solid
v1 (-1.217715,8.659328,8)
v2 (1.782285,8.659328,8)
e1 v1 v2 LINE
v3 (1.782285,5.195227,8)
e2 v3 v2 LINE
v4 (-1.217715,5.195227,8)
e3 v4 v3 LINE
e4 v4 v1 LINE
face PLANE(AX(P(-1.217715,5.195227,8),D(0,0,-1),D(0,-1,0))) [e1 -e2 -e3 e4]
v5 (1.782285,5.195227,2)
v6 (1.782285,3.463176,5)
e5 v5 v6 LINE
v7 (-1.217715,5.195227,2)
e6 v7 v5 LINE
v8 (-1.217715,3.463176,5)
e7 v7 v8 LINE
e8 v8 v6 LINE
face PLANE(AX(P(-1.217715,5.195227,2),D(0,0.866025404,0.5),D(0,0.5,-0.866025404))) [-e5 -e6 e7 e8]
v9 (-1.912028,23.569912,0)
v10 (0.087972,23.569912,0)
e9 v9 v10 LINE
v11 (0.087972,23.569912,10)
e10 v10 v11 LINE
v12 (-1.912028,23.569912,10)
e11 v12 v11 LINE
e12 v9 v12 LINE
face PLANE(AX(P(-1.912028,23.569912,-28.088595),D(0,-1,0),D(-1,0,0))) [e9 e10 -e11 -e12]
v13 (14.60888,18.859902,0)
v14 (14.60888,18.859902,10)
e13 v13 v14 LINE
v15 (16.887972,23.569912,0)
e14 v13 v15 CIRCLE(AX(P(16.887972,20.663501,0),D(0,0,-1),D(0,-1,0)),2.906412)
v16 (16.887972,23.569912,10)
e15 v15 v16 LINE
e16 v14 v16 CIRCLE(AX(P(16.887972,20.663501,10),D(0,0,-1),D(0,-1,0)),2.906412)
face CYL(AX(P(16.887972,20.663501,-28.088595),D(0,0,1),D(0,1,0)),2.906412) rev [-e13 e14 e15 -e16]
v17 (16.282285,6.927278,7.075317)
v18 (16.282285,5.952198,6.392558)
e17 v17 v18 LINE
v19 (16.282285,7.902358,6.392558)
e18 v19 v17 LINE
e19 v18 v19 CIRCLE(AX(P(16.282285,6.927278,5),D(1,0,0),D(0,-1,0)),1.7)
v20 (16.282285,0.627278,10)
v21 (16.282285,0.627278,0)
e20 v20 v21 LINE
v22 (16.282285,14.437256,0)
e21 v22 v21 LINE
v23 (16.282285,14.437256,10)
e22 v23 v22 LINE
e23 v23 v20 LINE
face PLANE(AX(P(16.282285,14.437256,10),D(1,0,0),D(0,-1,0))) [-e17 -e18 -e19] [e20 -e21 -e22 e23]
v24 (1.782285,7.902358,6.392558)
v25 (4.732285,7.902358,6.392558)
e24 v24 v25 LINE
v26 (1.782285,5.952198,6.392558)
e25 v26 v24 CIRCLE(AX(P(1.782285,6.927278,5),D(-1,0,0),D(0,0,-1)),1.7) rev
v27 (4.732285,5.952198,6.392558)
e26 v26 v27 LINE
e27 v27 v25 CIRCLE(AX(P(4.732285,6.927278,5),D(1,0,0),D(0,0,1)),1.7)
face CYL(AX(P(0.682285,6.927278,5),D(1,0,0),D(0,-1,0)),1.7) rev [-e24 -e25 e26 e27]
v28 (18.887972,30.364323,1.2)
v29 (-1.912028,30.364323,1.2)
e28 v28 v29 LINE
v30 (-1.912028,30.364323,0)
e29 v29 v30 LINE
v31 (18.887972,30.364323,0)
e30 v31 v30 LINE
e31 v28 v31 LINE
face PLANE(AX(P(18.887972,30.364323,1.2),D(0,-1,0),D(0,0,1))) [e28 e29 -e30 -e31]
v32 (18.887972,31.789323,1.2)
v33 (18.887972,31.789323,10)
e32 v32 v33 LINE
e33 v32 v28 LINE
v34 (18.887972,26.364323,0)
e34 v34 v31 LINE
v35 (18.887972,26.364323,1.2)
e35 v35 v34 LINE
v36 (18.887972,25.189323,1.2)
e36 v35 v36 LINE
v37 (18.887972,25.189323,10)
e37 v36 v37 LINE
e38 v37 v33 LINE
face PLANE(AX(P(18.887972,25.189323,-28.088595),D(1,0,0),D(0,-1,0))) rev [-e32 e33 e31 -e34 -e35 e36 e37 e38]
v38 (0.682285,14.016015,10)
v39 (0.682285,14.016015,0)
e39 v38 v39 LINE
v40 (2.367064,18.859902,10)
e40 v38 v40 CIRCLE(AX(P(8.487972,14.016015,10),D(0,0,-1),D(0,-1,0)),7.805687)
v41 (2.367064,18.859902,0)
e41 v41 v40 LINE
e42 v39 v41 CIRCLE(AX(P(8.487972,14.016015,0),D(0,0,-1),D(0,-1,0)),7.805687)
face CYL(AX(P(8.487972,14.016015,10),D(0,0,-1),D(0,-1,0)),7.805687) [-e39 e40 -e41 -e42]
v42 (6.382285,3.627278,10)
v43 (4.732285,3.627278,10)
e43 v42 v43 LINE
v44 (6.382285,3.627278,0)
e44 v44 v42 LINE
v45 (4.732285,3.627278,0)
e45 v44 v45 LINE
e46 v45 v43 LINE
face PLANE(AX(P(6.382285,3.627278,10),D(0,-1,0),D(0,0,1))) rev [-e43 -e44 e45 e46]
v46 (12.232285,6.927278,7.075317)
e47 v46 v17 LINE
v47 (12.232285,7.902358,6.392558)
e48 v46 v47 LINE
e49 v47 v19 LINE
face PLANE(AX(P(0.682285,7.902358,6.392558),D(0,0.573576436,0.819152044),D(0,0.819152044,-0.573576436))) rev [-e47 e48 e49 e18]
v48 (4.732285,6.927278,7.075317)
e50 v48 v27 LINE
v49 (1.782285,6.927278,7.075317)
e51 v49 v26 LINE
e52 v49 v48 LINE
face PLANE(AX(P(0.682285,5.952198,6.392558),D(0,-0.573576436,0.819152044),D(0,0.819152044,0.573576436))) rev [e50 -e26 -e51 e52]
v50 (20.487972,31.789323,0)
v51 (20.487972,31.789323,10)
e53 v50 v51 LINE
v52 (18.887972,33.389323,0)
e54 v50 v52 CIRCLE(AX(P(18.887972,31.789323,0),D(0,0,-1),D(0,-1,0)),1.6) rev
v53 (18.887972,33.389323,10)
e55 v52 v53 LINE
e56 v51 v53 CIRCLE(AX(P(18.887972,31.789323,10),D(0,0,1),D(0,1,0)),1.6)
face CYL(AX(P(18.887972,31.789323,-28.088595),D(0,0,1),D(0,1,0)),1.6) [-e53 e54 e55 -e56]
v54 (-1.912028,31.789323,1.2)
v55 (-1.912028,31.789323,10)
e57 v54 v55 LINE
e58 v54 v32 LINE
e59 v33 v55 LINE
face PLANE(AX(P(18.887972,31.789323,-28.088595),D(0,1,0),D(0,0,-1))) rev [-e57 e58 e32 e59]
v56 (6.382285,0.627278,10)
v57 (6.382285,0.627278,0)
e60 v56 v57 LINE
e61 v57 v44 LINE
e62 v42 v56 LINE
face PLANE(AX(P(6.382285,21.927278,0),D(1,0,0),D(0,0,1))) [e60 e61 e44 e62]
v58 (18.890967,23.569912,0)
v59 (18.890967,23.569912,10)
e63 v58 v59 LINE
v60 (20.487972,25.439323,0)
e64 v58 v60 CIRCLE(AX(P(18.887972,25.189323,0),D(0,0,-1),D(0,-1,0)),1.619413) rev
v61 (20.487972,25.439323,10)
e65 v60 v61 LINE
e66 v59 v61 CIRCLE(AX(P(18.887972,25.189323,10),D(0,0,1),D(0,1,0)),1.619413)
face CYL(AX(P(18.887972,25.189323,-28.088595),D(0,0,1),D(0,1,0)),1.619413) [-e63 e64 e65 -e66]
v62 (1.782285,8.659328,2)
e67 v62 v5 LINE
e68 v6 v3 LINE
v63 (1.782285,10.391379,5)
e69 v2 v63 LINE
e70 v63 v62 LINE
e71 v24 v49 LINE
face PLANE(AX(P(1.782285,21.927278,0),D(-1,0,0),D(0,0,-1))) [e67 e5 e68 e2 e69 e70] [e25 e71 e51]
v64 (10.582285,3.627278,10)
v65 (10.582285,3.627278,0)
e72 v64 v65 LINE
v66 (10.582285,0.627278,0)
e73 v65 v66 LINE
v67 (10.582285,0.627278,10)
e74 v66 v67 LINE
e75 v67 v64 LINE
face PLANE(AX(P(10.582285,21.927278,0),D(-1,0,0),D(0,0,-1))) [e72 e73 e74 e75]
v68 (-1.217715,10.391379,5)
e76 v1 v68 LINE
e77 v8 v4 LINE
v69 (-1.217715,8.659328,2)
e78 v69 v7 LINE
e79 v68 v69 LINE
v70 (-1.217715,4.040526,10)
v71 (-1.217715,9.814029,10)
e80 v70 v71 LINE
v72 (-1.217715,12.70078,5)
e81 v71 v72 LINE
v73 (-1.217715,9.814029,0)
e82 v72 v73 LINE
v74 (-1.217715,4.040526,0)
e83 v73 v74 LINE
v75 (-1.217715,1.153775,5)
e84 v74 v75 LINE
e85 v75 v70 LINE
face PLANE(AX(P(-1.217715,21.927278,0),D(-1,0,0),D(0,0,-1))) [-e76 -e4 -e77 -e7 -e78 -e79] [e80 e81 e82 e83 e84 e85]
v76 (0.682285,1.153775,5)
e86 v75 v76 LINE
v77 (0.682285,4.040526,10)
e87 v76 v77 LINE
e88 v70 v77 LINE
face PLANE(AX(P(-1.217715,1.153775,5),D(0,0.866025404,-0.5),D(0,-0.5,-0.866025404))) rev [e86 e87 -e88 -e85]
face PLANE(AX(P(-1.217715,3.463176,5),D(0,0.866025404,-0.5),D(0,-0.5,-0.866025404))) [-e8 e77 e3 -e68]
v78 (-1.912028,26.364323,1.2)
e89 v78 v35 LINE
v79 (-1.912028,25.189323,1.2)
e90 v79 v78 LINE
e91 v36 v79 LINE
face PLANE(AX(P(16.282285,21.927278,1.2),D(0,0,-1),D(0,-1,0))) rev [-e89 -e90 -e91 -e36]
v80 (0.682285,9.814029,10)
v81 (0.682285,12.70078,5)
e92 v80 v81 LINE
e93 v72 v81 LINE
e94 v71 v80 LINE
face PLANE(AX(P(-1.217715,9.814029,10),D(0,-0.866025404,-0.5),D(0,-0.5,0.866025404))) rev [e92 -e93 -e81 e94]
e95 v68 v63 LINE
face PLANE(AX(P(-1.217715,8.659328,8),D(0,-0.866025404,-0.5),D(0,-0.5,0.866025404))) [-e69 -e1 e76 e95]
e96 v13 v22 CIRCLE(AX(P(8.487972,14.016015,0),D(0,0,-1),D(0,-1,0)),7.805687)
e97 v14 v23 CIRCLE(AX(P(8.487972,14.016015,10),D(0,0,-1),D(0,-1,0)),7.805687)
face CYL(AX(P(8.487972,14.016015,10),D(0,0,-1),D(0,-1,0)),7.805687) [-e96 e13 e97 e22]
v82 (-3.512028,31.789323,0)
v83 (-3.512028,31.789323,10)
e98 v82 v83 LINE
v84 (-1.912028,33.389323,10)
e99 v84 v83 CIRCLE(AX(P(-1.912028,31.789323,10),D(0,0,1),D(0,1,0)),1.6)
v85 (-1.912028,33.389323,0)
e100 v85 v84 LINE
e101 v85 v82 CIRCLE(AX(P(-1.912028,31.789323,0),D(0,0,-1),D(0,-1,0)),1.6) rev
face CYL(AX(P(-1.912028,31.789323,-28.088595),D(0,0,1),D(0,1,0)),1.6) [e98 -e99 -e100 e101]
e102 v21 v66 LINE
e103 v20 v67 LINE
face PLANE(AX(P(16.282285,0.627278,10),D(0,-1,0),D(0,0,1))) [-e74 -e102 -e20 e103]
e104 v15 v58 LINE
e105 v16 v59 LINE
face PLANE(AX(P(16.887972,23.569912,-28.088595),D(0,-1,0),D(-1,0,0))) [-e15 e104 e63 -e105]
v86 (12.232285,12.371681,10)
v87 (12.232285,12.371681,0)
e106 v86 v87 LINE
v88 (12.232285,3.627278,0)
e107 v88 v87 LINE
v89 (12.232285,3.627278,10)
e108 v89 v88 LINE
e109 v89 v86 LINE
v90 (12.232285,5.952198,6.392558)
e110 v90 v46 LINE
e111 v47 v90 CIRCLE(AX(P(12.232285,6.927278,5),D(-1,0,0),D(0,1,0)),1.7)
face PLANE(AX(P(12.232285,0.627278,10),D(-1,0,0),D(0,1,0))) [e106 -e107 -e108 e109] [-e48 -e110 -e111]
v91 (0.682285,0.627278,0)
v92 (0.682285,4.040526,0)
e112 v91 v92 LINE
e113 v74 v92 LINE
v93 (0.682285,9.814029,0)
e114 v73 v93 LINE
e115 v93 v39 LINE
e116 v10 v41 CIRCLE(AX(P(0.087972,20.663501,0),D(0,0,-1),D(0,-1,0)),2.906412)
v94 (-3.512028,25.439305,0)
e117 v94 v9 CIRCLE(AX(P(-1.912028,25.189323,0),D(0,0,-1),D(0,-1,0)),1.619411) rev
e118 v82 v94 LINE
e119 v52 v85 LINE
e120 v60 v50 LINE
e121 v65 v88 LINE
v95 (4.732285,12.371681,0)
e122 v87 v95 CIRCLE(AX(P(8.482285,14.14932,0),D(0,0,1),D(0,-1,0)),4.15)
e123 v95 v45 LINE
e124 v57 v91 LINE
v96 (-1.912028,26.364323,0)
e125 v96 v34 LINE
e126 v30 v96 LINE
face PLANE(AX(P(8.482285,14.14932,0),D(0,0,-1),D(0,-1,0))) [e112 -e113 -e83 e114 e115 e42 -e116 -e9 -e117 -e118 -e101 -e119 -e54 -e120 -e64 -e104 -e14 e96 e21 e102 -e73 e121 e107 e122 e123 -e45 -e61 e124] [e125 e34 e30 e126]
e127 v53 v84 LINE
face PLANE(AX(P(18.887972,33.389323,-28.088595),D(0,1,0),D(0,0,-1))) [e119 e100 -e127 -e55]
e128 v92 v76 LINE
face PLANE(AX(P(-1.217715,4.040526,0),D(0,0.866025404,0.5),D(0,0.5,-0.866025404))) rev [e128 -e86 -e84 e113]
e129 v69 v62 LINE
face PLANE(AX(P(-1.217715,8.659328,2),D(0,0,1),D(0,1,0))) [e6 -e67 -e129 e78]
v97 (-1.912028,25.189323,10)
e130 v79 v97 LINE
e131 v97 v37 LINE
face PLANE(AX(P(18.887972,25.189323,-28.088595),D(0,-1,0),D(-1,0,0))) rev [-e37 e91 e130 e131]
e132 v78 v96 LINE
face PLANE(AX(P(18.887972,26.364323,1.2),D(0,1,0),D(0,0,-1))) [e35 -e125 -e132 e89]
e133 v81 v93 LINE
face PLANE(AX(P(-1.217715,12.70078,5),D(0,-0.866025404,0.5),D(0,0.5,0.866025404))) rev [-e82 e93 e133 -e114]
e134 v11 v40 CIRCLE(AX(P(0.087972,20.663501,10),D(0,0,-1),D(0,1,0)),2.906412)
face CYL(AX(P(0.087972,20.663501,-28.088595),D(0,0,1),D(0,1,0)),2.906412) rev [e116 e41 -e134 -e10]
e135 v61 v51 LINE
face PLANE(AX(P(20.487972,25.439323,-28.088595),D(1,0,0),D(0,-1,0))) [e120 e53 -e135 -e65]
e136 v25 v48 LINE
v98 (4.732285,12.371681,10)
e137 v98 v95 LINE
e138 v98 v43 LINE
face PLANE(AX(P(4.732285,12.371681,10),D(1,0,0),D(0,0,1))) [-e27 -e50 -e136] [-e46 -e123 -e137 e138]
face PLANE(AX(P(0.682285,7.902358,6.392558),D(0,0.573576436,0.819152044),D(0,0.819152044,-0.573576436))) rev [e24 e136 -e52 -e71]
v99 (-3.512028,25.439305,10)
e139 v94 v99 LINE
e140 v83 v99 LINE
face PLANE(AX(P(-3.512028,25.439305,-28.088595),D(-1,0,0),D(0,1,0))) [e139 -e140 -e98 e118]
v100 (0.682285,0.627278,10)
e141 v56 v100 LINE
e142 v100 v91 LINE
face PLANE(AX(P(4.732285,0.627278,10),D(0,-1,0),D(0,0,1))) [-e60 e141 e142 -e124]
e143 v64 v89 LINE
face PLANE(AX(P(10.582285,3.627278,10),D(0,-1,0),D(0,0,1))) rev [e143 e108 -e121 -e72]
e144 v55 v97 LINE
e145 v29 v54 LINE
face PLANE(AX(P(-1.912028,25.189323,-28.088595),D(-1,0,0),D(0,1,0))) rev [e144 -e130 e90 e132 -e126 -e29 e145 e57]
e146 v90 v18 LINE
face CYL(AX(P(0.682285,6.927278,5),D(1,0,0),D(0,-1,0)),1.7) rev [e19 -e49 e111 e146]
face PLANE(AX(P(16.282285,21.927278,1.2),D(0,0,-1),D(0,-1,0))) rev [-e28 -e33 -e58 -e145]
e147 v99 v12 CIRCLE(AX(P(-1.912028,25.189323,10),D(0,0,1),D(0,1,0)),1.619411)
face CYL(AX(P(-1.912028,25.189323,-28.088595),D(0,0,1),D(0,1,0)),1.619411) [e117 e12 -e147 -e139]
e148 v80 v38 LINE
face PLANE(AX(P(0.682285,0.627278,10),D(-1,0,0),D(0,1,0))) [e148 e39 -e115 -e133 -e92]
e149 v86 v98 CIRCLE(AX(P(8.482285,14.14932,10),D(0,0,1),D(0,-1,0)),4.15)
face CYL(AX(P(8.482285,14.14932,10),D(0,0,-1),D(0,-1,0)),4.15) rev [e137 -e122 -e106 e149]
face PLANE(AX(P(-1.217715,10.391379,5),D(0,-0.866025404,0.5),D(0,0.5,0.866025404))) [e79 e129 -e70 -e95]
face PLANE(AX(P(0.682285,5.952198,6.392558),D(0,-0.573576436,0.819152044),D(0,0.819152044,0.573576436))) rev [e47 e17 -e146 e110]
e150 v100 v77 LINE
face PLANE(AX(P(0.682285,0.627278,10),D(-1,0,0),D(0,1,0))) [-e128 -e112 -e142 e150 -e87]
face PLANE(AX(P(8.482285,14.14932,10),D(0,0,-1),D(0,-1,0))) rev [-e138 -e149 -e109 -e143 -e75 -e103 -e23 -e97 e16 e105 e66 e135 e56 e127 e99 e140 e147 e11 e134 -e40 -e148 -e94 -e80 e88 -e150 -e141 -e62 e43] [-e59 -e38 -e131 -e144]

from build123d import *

# Parameters (mm, degrees)
BOSS_EXTRUDE1_DEPTH   = 10
CUT_EXTRUDE6_DEPTH    = 29.232073959
BOSS_EXTRUDE4_DEPTH   = 1.9
CUT_EXTRUDE7_DEPTH    = 1.1
BOSS_EXTRUDE5_START   = -10
SKETCH31_W            = 6.6
SKETCH31_H            = 20.8
BOSS_EXTRUDE5_DEPTH   = 10
SKETCH32_W            = 1.175
SKETCH32_H            = 20.8
SKETCH32_W_2          = 1.425
BOSS_EXTRUDE6_DEPTH   = 1.2
SKETCH33_W            = 3
SKETCH33_H            = 10
BOSS_EXTRUDE7_DEPTH   = 1.65
SKETCH34_W            = 3
SKETCH34_H            = 10
BOSS_EXTRUDE8_DEPTH   = 1.65
BODY_MOVE_COPY1_ANGLE = 180


with BuildPart() as part:
    # Sketch1 → Boss-Extrude1 (new body)
    with BuildSketch(Plane.XY):
        with BuildLine():
            Line((7.490021902, 0), (21.300000001, 0))
            Line((21.300000001, 0), (21.300000001, 4.05))
            Line((21.300000001, 4.05), (9.555596341, 4.05))
            ThreePointArc((9.555596341, 4.05), (3.627957458, 7.8), (9.555596341, 11.55))
            Line((9.555596341, 11.55), (21.300000001, 11.55))
            Line((21.300000001, 11.55), (21.300000001, 15.6))
            Line((21.300000001, 15.6), (7.911262801, 15.6))
            ThreePointArc((7.911262801, 15.6), (0.108419667, 8.005009917), (7.490021902, 0))
        make_face()
    extrude(amount=-BOSS_EXTRUDE1_DEPTH)

    # Sketch19 → Cut-Extrude6 (cut, through all)
    with BuildSketch(Plane.XZ):
        with BuildLine():
            Line((15.975079943, -6.392558475), (15.000000001, -7.075316801))
            Line((15.000000001, -7.075316801), (14.024920059, -6.392558475))
            ThreePointArc((14.024920059, -6.392558475), (15.000000001, -3.3), (15.975079943, -6.392558475))
        make_face()
    extrude(amount=-CUT_EXTRUDE6_DEPTH, mode=Mode.SUBTRACT)

    # Sketch21 → Boss-Extrude4 (add)
    with BuildSketch(Plane(origin=(0, 15.6, 0), x_dir=(1, 0, 0), z_dir=(0, 1, 0))):
        Polygon((20.773502693, 5), (17.886751347, 10), (12.113248655, 10), (9.226497309, 5), (12.113248655, 0), (17.886751347, 0), align=None)
        Polygon((13.267949194, 8), (11.535898386, 5), (13.267949194, 2), (16.732050809, 2), (18.464101616, 5), (16.732050809, 8), align=None, mode=Mode.SUBTRACT)
    extrude(amount=BOSS_EXTRUDE4_DEPTH)

    # Sketch22 → Cut-Extrude7 (cut)
    with BuildSketch(Plane(origin=(0, 15.6, 0), x_dir=(1, 0, 0), z_dir=(0, 1, 0))):
        Polygon((16.732050809, 8), (13.267949194, 8), (11.535898386, 5), (13.267949194, 2), (16.732050809, 2), (18.464101616, 5), align=None)
    extrude(amount=-CUT_EXTRUDE7_DEPTH, mode=Mode.SUBTRACT)

    # Sketch31 → Boss-Extrude5 (add)
    with BuildSketch(Plane(origin=(0, 0, -10), x_dir=(-1, 0, 0), z_dir=(0, 0, -1)).offset(BOSS_EXTRUDE5_START)):
        with BuildLine():
            Line((1.642634889, 18.194312696), (1.642634889, 16.194312696))
            ThreePointArc((1.642634889, 16.194312696), (0.002167009, 13.578091054), (-3.067375979, 13.915220696))
            ThreePointArc((-3.067375979, 13.915220696), (-0.105575497, 7.794312696), (-3.067375979, 1.673404696))
            ThreePointArc((-3.067375979, 1.673404696), (0.002167009, 2.010534337), (1.642634889, -0.605687304))
            Line((1.642634889, -0.605687304), (1.642634889, -2.608681933))
            ThreePointArc((1.642634889, -2.608681933), (2.210176801, -3.836976077), (3.512045594, -4.205687304))
            Line((3.512045594, -4.205687304), (9.862045594, -4.205687304))
            ThreePointArc((9.862045594, -4.205687304), (10.993416444, -3.737058154), (11.462045594, -2.605687304))
            Line((11.462045594, -2.605687304), (11.462045594, 18.194312696))
            ThreePointArc((11.462045594, 18.194312696), (10.993416444, 19.325683546), (9.862045594, 19.794312696))
            Line((9.862045594, 19.794312696), (3.512027658, 19.794312696))
            ThreePointArc((3.512027658, 19.794312696), (2.209033865, 19.424620515), (1.642634889, 18.194312696))
        make_face()
        with Locations((6.562045594, 7.794312696)):
            Rectangle(SKETCH31_W, SKETCH31_H, mode=Mode.SUBTRACT)
    extrude(amount=BOSS_EXTRUDE5_DEPTH)

    # Sketch32 → Boss-Extrude6 (add)
    with BuildSketch(Plane.XY):
        with Locations((-3.849545594, 7.794312696)):
            Rectangle(SKETCH32_W, SKETCH32_H)
        with Locations((-9.149545594, 7.794312696)):
            Rectangle(SKETCH32_W_2, SKETCH32_H)
    extrude(amount=-BOSS_EXTRUDE6_DEPTH)

    # Sketch33 → Boss-Extrude7 (add)
    with BuildSketch(Plane.XZ.offset(-11.55)):
        with Locations((19.800000001, -5)):
            Rectangle(SKETCH33_W, SKETCH33_H)
    extrude(amount=BOSS_EXTRUDE7_DEPTH)

    # Sketch34 → Boss-Extrude8 (add)
    with BuildSketch(Plane(origin=(0, 4.05, 0), x_dir=(1, 0, 0), z_dir=(0, 1, 0))):
        with Locations((19.800000001, 5)):
            Rectangle(SKETCH34_W, SKETCH34_H)
    extrude(amount=BOSS_EXTRUDE8_DEPTH)


with BuildPart() as part_1:
    # Body-Move/Copy1: read off the stored shape, not the designer's step
    # Body-Move/Copy1: moved
    add(part.part.moved(Location((-21.9272776, -16.282285, 0))).rotate(Axis((0, 0, 0), (0.7071067812, -0.7071067812, 0)), BODY_MOVE_COPY1_ANGLE))


solid = part_1.part
